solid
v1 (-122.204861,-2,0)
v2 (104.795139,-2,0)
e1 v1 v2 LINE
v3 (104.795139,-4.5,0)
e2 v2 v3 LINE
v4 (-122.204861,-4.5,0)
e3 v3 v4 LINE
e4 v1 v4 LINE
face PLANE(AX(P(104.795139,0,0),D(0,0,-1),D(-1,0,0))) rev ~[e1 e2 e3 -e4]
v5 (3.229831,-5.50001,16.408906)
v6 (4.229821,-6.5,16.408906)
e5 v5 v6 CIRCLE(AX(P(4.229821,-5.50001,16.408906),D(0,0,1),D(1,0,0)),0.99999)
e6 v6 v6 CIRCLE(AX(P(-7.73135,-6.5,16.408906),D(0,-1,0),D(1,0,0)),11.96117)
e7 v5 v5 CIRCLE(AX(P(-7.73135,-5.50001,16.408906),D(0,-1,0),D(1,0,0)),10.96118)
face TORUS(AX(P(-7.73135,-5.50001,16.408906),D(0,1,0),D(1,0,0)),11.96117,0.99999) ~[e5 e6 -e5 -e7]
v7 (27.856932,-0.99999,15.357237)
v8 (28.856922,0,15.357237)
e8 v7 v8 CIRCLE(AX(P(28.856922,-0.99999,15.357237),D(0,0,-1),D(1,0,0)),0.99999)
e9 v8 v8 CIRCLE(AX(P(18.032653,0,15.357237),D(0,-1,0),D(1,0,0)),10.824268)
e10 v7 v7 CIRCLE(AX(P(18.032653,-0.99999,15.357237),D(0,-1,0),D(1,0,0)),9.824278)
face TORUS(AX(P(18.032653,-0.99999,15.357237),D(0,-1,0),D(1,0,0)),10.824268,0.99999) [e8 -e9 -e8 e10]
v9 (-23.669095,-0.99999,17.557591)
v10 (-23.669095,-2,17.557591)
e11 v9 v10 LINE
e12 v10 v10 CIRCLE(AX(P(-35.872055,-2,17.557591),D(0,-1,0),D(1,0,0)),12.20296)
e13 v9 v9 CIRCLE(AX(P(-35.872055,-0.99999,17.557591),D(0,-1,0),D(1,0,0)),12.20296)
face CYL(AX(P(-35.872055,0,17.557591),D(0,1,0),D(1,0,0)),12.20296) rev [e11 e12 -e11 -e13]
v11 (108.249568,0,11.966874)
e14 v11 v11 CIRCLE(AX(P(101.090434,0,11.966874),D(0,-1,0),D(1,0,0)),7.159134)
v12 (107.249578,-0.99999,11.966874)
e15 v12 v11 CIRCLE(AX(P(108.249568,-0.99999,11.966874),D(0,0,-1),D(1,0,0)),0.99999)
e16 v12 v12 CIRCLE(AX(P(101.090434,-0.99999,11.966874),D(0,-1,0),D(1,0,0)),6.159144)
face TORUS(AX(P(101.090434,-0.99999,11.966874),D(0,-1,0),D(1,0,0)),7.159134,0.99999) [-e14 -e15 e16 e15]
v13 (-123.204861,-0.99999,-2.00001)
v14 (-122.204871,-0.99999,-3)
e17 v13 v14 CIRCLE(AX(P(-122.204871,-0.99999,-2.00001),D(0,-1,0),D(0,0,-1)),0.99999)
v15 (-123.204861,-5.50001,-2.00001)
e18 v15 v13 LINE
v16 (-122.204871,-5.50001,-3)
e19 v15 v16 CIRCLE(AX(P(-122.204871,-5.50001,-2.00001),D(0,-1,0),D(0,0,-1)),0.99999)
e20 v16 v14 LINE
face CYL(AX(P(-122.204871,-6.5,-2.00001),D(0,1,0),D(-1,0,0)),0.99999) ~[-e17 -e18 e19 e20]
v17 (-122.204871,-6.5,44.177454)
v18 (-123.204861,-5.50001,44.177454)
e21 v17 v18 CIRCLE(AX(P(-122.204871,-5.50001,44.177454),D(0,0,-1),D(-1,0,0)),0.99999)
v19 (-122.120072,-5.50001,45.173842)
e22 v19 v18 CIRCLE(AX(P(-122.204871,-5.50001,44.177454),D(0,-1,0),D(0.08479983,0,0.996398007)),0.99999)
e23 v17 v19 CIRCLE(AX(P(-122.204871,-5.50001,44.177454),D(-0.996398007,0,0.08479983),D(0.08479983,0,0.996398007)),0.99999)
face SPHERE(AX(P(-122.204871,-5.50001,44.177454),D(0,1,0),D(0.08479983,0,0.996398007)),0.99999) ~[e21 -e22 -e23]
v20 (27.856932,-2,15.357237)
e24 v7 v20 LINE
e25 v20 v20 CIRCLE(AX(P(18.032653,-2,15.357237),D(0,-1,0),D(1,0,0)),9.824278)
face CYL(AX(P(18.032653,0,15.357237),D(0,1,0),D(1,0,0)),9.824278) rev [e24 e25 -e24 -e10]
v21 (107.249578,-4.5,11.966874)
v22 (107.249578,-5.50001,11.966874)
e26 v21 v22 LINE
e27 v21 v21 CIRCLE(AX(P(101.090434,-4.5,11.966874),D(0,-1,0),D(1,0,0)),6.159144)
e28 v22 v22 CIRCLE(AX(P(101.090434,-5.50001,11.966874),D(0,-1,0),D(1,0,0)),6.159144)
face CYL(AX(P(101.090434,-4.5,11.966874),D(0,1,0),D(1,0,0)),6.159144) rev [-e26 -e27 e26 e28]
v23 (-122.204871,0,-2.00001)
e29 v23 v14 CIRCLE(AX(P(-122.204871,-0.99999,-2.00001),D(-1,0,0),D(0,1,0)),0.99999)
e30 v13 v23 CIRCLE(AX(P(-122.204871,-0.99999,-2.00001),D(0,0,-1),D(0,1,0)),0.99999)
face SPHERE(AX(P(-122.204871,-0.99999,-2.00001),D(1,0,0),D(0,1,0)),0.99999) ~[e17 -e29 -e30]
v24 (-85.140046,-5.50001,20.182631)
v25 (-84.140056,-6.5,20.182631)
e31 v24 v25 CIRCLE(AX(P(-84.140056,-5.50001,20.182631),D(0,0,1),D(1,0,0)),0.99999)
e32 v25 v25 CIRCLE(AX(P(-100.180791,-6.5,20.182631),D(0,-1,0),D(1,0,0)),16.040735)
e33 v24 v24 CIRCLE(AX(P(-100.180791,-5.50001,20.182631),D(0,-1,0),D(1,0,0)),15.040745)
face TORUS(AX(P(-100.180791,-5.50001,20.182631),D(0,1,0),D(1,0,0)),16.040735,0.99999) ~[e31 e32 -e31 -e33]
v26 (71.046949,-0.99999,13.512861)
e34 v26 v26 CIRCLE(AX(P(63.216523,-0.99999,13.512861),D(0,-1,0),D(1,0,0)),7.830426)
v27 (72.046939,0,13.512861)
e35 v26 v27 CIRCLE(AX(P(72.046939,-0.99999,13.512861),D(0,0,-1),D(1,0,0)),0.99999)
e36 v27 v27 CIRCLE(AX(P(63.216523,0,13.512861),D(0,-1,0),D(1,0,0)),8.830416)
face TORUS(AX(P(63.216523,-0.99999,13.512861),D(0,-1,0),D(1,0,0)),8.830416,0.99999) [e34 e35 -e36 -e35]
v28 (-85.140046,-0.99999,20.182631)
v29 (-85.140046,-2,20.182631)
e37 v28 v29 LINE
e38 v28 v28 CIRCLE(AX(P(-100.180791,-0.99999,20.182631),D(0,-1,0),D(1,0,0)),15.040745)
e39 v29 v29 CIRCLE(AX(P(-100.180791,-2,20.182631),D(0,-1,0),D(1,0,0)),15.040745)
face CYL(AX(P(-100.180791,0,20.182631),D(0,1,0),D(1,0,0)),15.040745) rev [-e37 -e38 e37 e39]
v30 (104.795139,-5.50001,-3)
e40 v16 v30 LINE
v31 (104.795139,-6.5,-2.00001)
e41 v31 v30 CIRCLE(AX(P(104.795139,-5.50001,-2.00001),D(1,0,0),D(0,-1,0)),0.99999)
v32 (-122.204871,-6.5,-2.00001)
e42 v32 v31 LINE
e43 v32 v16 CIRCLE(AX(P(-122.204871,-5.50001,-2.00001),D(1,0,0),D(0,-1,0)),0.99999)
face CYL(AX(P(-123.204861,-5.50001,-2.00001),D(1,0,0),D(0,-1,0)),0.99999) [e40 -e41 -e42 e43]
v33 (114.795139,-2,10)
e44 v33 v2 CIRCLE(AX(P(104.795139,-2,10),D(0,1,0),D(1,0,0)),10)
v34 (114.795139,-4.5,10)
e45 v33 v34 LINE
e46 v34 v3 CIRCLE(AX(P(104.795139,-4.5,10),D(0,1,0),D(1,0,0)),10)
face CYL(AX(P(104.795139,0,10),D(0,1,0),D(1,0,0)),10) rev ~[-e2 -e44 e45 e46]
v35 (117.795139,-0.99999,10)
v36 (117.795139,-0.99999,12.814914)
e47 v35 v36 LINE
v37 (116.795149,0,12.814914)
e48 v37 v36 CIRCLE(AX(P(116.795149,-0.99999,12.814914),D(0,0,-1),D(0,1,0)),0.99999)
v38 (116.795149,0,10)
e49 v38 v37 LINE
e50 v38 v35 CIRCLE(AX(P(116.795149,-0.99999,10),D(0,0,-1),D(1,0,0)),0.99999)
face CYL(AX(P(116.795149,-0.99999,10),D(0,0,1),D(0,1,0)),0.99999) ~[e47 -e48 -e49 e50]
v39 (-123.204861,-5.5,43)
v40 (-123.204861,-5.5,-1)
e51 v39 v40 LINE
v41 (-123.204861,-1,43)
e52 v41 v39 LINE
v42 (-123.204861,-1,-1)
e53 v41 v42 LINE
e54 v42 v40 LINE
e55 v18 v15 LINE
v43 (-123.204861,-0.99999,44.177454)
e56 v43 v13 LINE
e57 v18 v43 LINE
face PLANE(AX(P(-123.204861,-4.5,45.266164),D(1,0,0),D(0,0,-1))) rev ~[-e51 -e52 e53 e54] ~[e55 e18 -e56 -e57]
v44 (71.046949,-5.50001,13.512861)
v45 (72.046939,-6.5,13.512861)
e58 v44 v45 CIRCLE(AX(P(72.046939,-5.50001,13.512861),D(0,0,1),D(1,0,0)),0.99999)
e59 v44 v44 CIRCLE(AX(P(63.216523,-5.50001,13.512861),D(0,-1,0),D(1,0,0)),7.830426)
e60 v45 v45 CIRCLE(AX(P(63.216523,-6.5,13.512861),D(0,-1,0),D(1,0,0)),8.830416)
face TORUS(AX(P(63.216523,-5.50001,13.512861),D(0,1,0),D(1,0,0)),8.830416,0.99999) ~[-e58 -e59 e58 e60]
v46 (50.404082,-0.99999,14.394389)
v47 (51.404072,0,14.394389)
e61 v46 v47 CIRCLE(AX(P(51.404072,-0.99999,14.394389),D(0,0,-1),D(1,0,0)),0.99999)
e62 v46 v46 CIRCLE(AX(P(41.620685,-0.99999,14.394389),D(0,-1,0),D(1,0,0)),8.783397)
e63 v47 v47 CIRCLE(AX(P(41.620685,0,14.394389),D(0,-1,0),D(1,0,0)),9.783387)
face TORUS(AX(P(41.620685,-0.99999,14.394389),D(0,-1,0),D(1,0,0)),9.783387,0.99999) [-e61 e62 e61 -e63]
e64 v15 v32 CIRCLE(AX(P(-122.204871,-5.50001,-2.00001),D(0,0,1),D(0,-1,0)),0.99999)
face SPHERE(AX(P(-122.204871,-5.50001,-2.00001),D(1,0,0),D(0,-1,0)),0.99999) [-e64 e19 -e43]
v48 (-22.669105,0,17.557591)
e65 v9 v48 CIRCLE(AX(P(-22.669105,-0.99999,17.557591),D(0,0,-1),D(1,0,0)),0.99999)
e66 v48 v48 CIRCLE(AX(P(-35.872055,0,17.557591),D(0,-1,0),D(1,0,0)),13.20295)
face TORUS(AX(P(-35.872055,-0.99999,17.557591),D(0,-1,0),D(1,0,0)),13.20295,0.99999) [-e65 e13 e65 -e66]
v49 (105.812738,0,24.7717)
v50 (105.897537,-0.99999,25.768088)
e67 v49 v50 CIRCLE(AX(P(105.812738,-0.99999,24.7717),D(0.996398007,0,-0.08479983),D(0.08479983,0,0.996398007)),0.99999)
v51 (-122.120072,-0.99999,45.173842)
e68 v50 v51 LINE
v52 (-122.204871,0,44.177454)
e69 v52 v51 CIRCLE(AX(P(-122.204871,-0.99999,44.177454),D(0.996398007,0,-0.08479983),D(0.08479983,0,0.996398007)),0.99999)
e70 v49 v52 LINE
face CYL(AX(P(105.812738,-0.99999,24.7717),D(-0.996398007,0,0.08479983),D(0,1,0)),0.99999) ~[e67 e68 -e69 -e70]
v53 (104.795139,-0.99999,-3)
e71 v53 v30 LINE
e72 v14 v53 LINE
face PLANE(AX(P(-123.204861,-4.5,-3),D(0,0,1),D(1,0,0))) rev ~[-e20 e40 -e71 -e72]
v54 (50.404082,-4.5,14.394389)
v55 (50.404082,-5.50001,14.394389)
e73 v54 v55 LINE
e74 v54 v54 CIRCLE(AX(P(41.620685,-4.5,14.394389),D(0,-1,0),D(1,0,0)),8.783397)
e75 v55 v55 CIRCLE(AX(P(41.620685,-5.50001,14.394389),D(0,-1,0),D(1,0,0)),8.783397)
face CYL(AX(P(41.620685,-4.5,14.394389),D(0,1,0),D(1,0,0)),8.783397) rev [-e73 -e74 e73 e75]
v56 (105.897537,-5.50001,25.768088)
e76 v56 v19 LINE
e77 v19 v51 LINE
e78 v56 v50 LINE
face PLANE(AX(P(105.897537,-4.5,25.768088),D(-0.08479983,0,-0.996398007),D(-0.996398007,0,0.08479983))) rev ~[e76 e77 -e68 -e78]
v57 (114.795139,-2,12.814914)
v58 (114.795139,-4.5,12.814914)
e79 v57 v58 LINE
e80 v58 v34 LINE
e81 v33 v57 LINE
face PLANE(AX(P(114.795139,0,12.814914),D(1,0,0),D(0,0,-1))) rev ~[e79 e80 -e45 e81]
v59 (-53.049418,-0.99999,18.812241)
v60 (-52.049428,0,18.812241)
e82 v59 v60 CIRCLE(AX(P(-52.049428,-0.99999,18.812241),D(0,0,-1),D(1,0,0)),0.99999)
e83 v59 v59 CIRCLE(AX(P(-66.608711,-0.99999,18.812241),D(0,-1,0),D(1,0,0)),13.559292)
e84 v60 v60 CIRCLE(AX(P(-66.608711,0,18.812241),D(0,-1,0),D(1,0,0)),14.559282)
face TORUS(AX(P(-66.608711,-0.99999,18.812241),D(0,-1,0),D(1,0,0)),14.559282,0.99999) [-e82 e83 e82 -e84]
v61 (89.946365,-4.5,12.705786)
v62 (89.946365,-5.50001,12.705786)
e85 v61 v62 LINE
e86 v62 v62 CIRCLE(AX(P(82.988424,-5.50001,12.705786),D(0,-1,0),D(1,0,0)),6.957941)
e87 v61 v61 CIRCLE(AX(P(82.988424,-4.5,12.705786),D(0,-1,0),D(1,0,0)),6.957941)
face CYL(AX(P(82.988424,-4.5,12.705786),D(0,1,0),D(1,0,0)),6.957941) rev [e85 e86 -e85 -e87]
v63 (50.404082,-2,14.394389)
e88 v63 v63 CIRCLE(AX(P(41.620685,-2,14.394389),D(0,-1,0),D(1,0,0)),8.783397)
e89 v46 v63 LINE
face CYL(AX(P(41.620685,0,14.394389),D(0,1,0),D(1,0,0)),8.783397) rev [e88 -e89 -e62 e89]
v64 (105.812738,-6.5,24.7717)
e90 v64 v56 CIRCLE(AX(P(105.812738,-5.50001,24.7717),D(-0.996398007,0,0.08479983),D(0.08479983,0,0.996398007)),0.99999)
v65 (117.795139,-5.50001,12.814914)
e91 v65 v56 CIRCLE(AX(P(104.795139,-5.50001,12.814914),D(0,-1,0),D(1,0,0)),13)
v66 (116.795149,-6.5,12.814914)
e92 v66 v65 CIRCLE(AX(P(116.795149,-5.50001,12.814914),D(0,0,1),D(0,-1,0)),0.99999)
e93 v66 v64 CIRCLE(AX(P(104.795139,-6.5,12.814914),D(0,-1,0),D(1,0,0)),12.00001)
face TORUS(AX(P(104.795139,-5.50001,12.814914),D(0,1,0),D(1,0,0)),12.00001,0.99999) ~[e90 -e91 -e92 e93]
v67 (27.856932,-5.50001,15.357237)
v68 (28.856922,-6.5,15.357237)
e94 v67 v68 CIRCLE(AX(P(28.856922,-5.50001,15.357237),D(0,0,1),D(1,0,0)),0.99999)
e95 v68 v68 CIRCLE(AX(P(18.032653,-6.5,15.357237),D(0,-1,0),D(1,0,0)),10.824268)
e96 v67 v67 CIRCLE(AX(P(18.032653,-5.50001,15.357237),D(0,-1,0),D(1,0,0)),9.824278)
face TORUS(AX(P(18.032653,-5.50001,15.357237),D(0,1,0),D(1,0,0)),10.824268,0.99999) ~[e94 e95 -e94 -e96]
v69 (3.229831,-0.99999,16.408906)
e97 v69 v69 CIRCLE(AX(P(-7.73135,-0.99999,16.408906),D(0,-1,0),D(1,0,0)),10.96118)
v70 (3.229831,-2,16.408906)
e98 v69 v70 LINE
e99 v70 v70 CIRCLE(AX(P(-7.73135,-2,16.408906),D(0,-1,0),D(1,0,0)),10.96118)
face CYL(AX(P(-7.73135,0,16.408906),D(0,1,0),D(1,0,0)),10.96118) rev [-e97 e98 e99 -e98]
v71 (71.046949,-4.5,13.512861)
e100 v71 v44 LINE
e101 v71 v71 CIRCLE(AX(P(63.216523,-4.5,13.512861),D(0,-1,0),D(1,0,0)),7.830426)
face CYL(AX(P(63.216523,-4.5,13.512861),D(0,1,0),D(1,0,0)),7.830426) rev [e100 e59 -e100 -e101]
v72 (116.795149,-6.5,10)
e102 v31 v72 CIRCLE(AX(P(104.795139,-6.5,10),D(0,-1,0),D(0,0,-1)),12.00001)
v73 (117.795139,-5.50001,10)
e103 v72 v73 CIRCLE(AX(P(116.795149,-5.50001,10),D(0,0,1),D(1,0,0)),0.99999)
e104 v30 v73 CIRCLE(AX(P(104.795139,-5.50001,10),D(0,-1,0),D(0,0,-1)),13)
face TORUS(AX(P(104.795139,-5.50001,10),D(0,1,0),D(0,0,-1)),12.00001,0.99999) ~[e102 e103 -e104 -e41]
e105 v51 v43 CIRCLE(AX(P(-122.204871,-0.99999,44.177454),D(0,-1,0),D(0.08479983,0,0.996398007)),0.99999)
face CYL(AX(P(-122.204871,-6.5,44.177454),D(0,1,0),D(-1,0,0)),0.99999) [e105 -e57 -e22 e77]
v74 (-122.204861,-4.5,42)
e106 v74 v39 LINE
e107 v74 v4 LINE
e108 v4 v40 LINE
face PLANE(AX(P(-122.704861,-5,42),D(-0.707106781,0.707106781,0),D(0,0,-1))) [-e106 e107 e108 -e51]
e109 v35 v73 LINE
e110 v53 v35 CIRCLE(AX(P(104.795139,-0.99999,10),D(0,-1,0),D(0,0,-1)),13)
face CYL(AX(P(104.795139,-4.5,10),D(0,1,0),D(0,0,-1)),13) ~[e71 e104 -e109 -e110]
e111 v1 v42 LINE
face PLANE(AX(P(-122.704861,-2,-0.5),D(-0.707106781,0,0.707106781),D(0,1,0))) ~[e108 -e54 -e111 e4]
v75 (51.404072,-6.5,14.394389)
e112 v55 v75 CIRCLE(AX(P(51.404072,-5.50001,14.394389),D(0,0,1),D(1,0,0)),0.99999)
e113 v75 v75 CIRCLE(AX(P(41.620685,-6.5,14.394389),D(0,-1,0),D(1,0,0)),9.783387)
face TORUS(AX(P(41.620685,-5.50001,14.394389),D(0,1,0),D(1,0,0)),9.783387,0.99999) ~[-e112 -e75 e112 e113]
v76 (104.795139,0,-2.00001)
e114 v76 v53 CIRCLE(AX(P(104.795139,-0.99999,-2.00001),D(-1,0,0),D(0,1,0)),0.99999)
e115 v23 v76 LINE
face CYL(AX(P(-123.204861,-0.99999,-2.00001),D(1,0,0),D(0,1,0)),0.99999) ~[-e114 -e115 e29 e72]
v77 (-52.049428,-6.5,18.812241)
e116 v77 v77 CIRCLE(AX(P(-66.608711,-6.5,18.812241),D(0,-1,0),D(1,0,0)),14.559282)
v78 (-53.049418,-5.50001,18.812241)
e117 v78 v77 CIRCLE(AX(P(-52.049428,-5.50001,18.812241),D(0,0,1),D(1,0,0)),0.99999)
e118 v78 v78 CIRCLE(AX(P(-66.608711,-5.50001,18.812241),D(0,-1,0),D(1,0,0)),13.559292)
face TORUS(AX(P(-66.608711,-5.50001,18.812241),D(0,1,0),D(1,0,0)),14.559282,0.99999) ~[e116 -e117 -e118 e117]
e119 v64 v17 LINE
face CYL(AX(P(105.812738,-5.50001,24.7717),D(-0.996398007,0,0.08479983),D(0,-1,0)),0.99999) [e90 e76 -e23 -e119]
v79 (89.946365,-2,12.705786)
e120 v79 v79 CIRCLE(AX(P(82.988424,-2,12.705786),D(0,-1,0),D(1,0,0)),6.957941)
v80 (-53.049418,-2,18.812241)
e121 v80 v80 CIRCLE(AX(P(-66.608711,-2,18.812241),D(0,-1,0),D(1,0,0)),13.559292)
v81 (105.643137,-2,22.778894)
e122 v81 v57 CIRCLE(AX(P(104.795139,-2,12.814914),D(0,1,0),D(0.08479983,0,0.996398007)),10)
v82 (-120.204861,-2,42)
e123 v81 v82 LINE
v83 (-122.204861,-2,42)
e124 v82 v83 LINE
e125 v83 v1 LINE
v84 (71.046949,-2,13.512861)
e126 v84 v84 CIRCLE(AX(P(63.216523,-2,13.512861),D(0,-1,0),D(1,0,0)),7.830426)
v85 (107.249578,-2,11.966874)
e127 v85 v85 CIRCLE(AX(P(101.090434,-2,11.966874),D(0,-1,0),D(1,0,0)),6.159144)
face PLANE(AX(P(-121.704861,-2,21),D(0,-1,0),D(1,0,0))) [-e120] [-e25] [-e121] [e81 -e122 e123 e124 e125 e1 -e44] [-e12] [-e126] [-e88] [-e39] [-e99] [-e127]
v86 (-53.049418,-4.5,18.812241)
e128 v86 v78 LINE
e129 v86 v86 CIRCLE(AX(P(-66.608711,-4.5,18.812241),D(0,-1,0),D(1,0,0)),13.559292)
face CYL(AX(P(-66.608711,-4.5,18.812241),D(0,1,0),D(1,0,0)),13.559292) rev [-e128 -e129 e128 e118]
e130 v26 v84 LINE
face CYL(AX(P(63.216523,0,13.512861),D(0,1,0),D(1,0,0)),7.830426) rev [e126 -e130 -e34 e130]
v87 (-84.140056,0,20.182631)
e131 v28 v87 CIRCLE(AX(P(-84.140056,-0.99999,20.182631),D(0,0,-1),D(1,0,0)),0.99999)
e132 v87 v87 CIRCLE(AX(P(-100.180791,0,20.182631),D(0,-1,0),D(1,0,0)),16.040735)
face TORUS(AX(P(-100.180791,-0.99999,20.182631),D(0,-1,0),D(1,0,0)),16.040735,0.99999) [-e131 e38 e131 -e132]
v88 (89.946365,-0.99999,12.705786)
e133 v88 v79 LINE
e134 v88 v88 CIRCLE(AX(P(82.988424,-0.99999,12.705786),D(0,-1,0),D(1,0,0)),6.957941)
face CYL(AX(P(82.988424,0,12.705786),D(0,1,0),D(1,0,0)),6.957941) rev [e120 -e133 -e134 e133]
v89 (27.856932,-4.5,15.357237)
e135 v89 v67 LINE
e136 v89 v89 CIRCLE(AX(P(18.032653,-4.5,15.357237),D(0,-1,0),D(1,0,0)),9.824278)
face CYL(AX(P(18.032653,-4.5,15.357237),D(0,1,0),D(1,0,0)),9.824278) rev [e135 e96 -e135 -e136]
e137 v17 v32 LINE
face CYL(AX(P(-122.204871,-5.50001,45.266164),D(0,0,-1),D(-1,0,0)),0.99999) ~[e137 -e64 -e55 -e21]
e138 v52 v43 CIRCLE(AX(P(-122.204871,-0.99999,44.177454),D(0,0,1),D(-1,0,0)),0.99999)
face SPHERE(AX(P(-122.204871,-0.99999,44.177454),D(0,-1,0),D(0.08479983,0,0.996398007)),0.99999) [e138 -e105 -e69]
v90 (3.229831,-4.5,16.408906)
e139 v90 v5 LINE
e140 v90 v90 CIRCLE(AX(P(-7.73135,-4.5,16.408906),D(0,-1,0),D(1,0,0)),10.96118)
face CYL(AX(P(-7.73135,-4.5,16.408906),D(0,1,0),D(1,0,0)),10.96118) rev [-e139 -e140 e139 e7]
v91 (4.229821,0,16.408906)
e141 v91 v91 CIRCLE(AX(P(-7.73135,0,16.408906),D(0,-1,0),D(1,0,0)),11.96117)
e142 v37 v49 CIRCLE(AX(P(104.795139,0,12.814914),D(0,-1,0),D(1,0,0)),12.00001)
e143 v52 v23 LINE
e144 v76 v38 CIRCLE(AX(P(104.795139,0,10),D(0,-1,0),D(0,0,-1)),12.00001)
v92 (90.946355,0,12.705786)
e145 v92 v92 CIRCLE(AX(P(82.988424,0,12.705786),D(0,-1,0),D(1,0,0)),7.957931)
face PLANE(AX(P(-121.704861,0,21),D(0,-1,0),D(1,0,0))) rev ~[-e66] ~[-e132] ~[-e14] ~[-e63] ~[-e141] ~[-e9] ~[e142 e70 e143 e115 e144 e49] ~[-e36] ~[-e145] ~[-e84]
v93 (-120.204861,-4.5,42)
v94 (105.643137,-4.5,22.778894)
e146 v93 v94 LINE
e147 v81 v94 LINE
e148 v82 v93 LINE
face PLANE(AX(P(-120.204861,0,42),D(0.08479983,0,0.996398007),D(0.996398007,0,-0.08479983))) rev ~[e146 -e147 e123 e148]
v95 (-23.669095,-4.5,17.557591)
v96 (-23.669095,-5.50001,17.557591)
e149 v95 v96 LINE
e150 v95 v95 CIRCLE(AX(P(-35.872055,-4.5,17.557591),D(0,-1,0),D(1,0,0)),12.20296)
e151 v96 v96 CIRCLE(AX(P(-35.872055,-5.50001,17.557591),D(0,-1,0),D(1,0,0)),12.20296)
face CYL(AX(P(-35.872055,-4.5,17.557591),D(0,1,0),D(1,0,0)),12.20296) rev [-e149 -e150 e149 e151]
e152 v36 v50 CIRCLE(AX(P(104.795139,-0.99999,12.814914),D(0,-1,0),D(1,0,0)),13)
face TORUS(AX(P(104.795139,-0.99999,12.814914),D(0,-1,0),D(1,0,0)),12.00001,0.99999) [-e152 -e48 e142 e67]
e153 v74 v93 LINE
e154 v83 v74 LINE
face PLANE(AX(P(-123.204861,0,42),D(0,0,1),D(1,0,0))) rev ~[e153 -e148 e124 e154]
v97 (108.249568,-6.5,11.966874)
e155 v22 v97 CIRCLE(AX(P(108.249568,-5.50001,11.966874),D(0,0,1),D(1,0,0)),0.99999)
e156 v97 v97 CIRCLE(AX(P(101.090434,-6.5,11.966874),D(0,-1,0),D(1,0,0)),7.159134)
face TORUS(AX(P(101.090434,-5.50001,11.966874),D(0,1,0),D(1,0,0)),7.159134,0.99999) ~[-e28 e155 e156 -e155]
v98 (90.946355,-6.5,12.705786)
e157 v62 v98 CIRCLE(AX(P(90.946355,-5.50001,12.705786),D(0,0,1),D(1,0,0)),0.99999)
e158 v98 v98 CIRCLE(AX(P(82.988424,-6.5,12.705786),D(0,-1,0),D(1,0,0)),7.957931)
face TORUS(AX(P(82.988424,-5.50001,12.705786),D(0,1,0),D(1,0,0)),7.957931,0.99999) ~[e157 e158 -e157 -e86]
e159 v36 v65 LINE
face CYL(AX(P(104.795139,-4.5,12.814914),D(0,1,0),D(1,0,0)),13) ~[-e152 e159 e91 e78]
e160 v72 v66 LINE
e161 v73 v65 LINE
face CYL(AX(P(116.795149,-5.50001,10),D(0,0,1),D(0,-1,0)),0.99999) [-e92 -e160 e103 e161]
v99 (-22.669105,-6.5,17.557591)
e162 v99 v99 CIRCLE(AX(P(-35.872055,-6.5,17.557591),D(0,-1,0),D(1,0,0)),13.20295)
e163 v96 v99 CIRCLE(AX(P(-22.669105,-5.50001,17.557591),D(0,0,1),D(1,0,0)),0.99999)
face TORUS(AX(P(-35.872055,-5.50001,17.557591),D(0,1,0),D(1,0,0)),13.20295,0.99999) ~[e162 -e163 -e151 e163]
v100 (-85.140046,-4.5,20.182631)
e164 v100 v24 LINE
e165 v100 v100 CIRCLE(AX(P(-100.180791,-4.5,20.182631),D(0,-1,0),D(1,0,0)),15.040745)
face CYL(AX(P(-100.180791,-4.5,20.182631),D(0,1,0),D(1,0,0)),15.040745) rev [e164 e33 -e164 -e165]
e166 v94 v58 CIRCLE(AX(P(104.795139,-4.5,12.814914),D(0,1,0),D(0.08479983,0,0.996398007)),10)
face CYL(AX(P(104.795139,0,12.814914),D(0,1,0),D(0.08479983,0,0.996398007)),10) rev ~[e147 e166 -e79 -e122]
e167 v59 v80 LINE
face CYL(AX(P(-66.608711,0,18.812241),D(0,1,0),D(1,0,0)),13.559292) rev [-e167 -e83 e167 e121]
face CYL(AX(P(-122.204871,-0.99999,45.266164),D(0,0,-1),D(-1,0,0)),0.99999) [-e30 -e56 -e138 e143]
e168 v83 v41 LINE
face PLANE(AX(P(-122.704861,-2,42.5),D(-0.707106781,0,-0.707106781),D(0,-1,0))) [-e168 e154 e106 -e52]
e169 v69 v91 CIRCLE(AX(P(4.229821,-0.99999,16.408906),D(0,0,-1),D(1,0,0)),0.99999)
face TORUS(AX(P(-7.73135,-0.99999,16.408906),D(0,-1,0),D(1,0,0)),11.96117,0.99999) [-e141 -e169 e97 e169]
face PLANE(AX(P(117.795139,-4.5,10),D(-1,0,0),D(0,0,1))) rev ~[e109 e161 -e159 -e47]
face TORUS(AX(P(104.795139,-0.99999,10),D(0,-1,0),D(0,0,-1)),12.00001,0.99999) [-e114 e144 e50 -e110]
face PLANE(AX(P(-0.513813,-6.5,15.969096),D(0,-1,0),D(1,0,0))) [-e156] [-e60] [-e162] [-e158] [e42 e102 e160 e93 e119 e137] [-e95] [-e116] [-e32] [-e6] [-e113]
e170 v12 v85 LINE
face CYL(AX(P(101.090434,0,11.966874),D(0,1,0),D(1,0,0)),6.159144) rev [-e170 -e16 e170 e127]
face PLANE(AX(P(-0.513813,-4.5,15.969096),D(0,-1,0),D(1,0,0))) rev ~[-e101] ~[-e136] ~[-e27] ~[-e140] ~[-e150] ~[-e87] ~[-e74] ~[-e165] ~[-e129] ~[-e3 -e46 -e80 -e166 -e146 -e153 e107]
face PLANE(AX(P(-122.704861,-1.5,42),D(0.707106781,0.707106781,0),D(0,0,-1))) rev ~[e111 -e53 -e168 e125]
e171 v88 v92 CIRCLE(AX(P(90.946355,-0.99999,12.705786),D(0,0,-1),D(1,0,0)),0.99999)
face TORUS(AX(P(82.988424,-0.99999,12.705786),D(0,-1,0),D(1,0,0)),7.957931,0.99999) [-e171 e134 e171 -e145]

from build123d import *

# Parameters (mm, degrees)
F0_W     = 3
F0_H     = 42
F0_R     = 15.0407454206
F0_R_2   = 13.5592924796
F0_R_3   = 12.2029598094
F0_R_4   = 10.9611800259
F0_R_5   = 8.7833966951
F0_R_6   = 9.8242782432
F0_R_7   = 7.8304257228
F0_R_8   = 6.9579405917
F0_R_9   = 6.1591436438
F1_DEPTH = 2
F2_DEPTH = 4.5
F3_START = 4.5
F3_DEPTH = 2
F4_SIZE  = 1
F5_R     = 0.99999


# Not quite as in the source:
# - a fillet or chamfer is up to 0.001 mm smaller than in the source, because OpenCascade refuses the exact size


with BuildPart() as f1:
    # F0 (on Front) → F1 (new body)
    with BuildSketch(Plane.XZ):
        with Locations((-121.7048612587, 21)):
            Rectangle(F0_W, F0_H)
        with BuildLine():
            Line((104.7951387413, 0), (-120.2048612587, 0))
            Line((-120.2048612587, 0), (-123.2048612587, 0))
            Line((-123.2048612587, 0), (-123.2048612587, -3))
            Line((-123.2048612587, -3), (104.7951387413, -3))
            ThreePointArc((104.7951387413, -3), (113.9875268967, 0.8076118446), (117.7951387413, 10))
            Line((117.7951387413, 10), (117.7951387413, 12.8149136893))
            ThreePointArc((117.7951387413, 12.8149136893), (114.3693533654, 21.6089124573), (105.8975365365, 25.768087783))
            Line((105.8975365365, 25.768087783), (-123.2048612587, 45.2661641911))
            Line((-123.2048612587, 45.2661641911), (-123.2048612587, 42))
            Line((-123.2048612587, 42), (-120.2048612587, 42))
            Line((-120.2048612587, 42), (105.6431370453, 22.7788937614))
            ThreePointArc((105.6431370453, 22.7788937614), (112.1599192214, 19.5795281262), (114.7951387413, 12.8149136893))
            Line((114.7951387413, 12.8149136893), (114.7951387413, 10))
            ThreePointArc((114.7951387413, 10), (111.8662065532, 2.9289321881), (104.7951387413, 0))
        make_face()
        with BuildLine():
            Line((-120.2048612587, 42), (-120.2048612587, 0))
            Line((-120.2048612587, 0), (104.7951387413, 0))
            ThreePointArc((104.7951387413, 0), (111.8662065532, 2.9289321881), (114.7951387413, 10))
            Line((114.7951387413, 10), (114.7951387413, 12.8149136893))
            ThreePointArc((114.7951387413, 12.8149136893), (112.1599192214, 19.5795281262), (105.6431370453, 22.7788937614))
            Line((105.6431370453, 22.7788937614), (-120.2048612587, 42))
        make_face()
        with Locations((-100.180791127, 20.1826308218)):
            Circle(F0_R, mode=Mode.SUBTRACT)
        with Locations((-66.6087107866, 18.8122409091)):
            Circle(F0_R_2, mode=Mode.SUBTRACT)
        with Locations((-35.8720548232, 17.557591127)):
            Circle(F0_R_3, mode=Mode.SUBTRACT)
        with Locations((-7.7313495038, 16.4089063177)):
            Circle(F0_R_4, mode=Mode.SUBTRACT)
        with Locations((41.6206851942, 14.3943892001)):
            Circle(F0_R_5, mode=Mode.SUBTRACT)
        with Locations((18.0326534773, 15.3572369115)):
            Circle(F0_R_6, mode=Mode.SUBTRACT)
        with Locations((63.2165234141, 13.5128614975)):
            Circle(F0_R_7, mode=Mode.SUBTRACT)
        with Locations((82.9884244366, 12.705785694)):
            Circle(F0_R_8, mode=Mode.SUBTRACT)
        with Locations((101.0904340027, 11.9668737452)):
            Circle(F0_R_9, mode=Mode.SUBTRACT)
    extrude(amount=F1_DEPTH)

    # F0 (on Front) → F2 (join)
    with BuildSketch(Plane.XZ):
        with BuildLine():
            Line((104.7951387413, 0), (-120.2048612587, 0))
            Line((-120.2048612587, 0), (-123.2048612587, 0))
            Line((-123.2048612587, 0), (-123.2048612587, -3))
            Line((-123.2048612587, -3), (104.7951387413, -3))
            ThreePointArc((104.7951387413, -3), (113.9875268967, 0.8076118446), (117.7951387413, 10))
            Line((117.7951387413, 10), (117.7951387413, 12.8149136893))
            ThreePointArc((117.7951387413, 12.8149136893), (114.3693533654, 21.6089124573), (105.8975365365, 25.768087783))
            Line((105.8975365365, 25.768087783), (-123.2048612587, 45.2661641911))
            Line((-123.2048612587, 45.2661641911), (-123.2048612587, 42))
            Line((-123.2048612587, 42), (-120.2048612587, 42))
            Line((-120.2048612587, 42), (105.6431370453, 22.7788937614))
            ThreePointArc((105.6431370453, 22.7788937614), (112.1599192214, 19.5795281262), (114.7951387413, 12.8149136893))
            Line((114.7951387413, 12.8149136893), (114.7951387413, 10))
            ThreePointArc((114.7951387413, 10), (111.8662065532, 2.9289321881), (104.7951387413, 0))
        make_face()
    extrude(amount=F2_DEPTH)

    # F0 (on Front) → F3 (join)
    with BuildSketch(Plane.XZ.offset(F3_START)):
        with BuildLine():
            Line((104.7951387413, 0), (-120.2048612587, 0))
            Line((-120.2048612587, 0), (-123.2048612587, 0))
            Line((-123.2048612587, 0), (-123.2048612587, -3))
            Line((-123.2048612587, -3), (104.7951387413, -3))
            ThreePointArc((104.7951387413, -3), (113.9875268967, 0.8076118446), (117.7951387413, 10))
            Line((117.7951387413, 10), (117.7951387413, 12.8149136893))
            ThreePointArc((117.7951387413, 12.8149136893), (114.3693533654, 21.6089124573), (105.8975365365, 25.768087783))
            Line((105.8975365365, 25.768087783), (-123.2048612587, 45.2661641911))
            Line((-123.2048612587, 45.2661641911), (-123.2048612587, 42))
            Line((-123.2048612587, 42), (-120.2048612587, 42))
            Line((-120.2048612587, 42), (105.6431370453, 22.7788937614))
            ThreePointArc((105.6431370453, 22.7788937614), (112.1599192214, 19.5795281262), (114.7951387413, 12.8149136893))
            Line((114.7951387413, 12.8149136893), (114.7951387413, 10))
            ThreePointArc((114.7951387413, 10), (111.8662065532, 2.9289321881), (104.7951387413, 0))
        make_face()
        with Locations((-121.7048612587, 21)):
            Rectangle(F0_W, F0_H)
        with BuildLine():
            Line((-120.2048612587, 42), (-120.2048612587, 0))
            Line((-120.2048612587, 0), (104.7951387413, 0))
            ThreePointArc((104.7951387413, 0), (111.8662065532, 2.9289321881), (114.7951387413, 10))
            Line((114.7951387413, 10), (114.7951387413, 12.8149136893))
            ThreePointArc((114.7951387413, 12.8149136893), (112.1599192214, 19.5795281262), (105.6431370453, 22.7788937614))
            Line((105.6431370453, 22.7788937614), (-120.2048612587, 42))
        make_face()
        with Locations((-100.180791127, 20.1826308218)):
            Circle(F0_R, mode=Mode.SUBTRACT)
        with Locations((-66.6087107866, 18.8122409091)):
            Circle(F0_R_2, mode=Mode.SUBTRACT)
        with Locations((-35.8720548232, 17.557591127)):
            Circle(F0_R_3, mode=Mode.SUBTRACT)
        with Locations((-7.7313495038, 16.4089063177)):
            Circle(F0_R_4, mode=Mode.SUBTRACT)
        with Locations((41.6206851942, 14.3943892001)):
            Circle(F0_R_5, mode=Mode.SUBTRACT)
        with Locations((18.0326534773, 15.3572369115)):
            Circle(F0_R_6, mode=Mode.SUBTRACT)
        with Locations((63.2165234141, 13.5128614975)):
            Circle(F0_R_7, mode=Mode.SUBTRACT)
        with Locations((82.9884244366, 12.705785694)):
            Circle(F0_R_8, mode=Mode.SUBTRACT)
        with Locations((101.0904340027, 11.9668737452)):
            Circle(F0_R_9, mode=Mode.SUBTRACT)
    extrude(amount=F3_DEPTH)

    # F4
    f4_edges = [f1.edges().sort_by_distance(p)[0] for p in [
        (-123.204861, -4.5, 21),
        (-123.204861, -3.25, 0),
        (-123.204861, -2, 21),
        (-123.204861, -3.25, 42),
    ]]
    chamfer(f4_edges, length=F4_SIZE)

    # F5 (radius 1 in the source; OpenCascade refuses exactly that, so slightly less here)
    f5_edges = [f1.edges().sort_by_distance(p)[0] for p in [
        (-9.204861, 0, -3),
        (113.987527, 0, 0.807612),
        (117.795139, 0, 11.407457),
        (114.369353, 0, 21.608912),
        (-8.653662, 0, 35.517126),
        (-123.204861, 0, 21.133082),
        (94.93129, 0, 11.966874),
        (8.208375, 0, 15.357237),
        (32.837288, 0, 14.394389),
        (55.386098, 0, 13.512861),
        (76.030484, 0, 12.705786),
        (-115.221537, 0, 20.182631),
        (-80.168003, 0, 18.812241),
        (-18.69253, 0, 16.408906),
        (-48.075015, 0, 17.557591),
        (-9.204861, -6.5, -3),
        (113.987527, -6.5, 0.807612),
        (117.795139, -6.5, 11.407457),
        (114.369353, -6.5, 21.608912),
        (-8.653662, -6.5, 35.517126),
        (-123.204861, -6.5, 21.133082),
        (94.93129, -6.5, 11.966874),
        (-18.69253, -6.5, 16.408906),
        (32.837288, -6.5, 14.394389),
        (8.208375, -6.5, 15.357237),
        (55.386098, -6.5, 13.512861),
        (76.030484, -6.5, 12.705786),
        (-115.221537, -6.5, 20.182631),
        (-80.168003, -6.5, 18.812241),
        (-48.075015, -6.5, 17.557591),
        (-123.204861, -3.25, -3),
        (-123.204861, -3.25, 45.266164),
    ]]
    fillet(f5_edges, radius=F5_R)


solid = f1.part
